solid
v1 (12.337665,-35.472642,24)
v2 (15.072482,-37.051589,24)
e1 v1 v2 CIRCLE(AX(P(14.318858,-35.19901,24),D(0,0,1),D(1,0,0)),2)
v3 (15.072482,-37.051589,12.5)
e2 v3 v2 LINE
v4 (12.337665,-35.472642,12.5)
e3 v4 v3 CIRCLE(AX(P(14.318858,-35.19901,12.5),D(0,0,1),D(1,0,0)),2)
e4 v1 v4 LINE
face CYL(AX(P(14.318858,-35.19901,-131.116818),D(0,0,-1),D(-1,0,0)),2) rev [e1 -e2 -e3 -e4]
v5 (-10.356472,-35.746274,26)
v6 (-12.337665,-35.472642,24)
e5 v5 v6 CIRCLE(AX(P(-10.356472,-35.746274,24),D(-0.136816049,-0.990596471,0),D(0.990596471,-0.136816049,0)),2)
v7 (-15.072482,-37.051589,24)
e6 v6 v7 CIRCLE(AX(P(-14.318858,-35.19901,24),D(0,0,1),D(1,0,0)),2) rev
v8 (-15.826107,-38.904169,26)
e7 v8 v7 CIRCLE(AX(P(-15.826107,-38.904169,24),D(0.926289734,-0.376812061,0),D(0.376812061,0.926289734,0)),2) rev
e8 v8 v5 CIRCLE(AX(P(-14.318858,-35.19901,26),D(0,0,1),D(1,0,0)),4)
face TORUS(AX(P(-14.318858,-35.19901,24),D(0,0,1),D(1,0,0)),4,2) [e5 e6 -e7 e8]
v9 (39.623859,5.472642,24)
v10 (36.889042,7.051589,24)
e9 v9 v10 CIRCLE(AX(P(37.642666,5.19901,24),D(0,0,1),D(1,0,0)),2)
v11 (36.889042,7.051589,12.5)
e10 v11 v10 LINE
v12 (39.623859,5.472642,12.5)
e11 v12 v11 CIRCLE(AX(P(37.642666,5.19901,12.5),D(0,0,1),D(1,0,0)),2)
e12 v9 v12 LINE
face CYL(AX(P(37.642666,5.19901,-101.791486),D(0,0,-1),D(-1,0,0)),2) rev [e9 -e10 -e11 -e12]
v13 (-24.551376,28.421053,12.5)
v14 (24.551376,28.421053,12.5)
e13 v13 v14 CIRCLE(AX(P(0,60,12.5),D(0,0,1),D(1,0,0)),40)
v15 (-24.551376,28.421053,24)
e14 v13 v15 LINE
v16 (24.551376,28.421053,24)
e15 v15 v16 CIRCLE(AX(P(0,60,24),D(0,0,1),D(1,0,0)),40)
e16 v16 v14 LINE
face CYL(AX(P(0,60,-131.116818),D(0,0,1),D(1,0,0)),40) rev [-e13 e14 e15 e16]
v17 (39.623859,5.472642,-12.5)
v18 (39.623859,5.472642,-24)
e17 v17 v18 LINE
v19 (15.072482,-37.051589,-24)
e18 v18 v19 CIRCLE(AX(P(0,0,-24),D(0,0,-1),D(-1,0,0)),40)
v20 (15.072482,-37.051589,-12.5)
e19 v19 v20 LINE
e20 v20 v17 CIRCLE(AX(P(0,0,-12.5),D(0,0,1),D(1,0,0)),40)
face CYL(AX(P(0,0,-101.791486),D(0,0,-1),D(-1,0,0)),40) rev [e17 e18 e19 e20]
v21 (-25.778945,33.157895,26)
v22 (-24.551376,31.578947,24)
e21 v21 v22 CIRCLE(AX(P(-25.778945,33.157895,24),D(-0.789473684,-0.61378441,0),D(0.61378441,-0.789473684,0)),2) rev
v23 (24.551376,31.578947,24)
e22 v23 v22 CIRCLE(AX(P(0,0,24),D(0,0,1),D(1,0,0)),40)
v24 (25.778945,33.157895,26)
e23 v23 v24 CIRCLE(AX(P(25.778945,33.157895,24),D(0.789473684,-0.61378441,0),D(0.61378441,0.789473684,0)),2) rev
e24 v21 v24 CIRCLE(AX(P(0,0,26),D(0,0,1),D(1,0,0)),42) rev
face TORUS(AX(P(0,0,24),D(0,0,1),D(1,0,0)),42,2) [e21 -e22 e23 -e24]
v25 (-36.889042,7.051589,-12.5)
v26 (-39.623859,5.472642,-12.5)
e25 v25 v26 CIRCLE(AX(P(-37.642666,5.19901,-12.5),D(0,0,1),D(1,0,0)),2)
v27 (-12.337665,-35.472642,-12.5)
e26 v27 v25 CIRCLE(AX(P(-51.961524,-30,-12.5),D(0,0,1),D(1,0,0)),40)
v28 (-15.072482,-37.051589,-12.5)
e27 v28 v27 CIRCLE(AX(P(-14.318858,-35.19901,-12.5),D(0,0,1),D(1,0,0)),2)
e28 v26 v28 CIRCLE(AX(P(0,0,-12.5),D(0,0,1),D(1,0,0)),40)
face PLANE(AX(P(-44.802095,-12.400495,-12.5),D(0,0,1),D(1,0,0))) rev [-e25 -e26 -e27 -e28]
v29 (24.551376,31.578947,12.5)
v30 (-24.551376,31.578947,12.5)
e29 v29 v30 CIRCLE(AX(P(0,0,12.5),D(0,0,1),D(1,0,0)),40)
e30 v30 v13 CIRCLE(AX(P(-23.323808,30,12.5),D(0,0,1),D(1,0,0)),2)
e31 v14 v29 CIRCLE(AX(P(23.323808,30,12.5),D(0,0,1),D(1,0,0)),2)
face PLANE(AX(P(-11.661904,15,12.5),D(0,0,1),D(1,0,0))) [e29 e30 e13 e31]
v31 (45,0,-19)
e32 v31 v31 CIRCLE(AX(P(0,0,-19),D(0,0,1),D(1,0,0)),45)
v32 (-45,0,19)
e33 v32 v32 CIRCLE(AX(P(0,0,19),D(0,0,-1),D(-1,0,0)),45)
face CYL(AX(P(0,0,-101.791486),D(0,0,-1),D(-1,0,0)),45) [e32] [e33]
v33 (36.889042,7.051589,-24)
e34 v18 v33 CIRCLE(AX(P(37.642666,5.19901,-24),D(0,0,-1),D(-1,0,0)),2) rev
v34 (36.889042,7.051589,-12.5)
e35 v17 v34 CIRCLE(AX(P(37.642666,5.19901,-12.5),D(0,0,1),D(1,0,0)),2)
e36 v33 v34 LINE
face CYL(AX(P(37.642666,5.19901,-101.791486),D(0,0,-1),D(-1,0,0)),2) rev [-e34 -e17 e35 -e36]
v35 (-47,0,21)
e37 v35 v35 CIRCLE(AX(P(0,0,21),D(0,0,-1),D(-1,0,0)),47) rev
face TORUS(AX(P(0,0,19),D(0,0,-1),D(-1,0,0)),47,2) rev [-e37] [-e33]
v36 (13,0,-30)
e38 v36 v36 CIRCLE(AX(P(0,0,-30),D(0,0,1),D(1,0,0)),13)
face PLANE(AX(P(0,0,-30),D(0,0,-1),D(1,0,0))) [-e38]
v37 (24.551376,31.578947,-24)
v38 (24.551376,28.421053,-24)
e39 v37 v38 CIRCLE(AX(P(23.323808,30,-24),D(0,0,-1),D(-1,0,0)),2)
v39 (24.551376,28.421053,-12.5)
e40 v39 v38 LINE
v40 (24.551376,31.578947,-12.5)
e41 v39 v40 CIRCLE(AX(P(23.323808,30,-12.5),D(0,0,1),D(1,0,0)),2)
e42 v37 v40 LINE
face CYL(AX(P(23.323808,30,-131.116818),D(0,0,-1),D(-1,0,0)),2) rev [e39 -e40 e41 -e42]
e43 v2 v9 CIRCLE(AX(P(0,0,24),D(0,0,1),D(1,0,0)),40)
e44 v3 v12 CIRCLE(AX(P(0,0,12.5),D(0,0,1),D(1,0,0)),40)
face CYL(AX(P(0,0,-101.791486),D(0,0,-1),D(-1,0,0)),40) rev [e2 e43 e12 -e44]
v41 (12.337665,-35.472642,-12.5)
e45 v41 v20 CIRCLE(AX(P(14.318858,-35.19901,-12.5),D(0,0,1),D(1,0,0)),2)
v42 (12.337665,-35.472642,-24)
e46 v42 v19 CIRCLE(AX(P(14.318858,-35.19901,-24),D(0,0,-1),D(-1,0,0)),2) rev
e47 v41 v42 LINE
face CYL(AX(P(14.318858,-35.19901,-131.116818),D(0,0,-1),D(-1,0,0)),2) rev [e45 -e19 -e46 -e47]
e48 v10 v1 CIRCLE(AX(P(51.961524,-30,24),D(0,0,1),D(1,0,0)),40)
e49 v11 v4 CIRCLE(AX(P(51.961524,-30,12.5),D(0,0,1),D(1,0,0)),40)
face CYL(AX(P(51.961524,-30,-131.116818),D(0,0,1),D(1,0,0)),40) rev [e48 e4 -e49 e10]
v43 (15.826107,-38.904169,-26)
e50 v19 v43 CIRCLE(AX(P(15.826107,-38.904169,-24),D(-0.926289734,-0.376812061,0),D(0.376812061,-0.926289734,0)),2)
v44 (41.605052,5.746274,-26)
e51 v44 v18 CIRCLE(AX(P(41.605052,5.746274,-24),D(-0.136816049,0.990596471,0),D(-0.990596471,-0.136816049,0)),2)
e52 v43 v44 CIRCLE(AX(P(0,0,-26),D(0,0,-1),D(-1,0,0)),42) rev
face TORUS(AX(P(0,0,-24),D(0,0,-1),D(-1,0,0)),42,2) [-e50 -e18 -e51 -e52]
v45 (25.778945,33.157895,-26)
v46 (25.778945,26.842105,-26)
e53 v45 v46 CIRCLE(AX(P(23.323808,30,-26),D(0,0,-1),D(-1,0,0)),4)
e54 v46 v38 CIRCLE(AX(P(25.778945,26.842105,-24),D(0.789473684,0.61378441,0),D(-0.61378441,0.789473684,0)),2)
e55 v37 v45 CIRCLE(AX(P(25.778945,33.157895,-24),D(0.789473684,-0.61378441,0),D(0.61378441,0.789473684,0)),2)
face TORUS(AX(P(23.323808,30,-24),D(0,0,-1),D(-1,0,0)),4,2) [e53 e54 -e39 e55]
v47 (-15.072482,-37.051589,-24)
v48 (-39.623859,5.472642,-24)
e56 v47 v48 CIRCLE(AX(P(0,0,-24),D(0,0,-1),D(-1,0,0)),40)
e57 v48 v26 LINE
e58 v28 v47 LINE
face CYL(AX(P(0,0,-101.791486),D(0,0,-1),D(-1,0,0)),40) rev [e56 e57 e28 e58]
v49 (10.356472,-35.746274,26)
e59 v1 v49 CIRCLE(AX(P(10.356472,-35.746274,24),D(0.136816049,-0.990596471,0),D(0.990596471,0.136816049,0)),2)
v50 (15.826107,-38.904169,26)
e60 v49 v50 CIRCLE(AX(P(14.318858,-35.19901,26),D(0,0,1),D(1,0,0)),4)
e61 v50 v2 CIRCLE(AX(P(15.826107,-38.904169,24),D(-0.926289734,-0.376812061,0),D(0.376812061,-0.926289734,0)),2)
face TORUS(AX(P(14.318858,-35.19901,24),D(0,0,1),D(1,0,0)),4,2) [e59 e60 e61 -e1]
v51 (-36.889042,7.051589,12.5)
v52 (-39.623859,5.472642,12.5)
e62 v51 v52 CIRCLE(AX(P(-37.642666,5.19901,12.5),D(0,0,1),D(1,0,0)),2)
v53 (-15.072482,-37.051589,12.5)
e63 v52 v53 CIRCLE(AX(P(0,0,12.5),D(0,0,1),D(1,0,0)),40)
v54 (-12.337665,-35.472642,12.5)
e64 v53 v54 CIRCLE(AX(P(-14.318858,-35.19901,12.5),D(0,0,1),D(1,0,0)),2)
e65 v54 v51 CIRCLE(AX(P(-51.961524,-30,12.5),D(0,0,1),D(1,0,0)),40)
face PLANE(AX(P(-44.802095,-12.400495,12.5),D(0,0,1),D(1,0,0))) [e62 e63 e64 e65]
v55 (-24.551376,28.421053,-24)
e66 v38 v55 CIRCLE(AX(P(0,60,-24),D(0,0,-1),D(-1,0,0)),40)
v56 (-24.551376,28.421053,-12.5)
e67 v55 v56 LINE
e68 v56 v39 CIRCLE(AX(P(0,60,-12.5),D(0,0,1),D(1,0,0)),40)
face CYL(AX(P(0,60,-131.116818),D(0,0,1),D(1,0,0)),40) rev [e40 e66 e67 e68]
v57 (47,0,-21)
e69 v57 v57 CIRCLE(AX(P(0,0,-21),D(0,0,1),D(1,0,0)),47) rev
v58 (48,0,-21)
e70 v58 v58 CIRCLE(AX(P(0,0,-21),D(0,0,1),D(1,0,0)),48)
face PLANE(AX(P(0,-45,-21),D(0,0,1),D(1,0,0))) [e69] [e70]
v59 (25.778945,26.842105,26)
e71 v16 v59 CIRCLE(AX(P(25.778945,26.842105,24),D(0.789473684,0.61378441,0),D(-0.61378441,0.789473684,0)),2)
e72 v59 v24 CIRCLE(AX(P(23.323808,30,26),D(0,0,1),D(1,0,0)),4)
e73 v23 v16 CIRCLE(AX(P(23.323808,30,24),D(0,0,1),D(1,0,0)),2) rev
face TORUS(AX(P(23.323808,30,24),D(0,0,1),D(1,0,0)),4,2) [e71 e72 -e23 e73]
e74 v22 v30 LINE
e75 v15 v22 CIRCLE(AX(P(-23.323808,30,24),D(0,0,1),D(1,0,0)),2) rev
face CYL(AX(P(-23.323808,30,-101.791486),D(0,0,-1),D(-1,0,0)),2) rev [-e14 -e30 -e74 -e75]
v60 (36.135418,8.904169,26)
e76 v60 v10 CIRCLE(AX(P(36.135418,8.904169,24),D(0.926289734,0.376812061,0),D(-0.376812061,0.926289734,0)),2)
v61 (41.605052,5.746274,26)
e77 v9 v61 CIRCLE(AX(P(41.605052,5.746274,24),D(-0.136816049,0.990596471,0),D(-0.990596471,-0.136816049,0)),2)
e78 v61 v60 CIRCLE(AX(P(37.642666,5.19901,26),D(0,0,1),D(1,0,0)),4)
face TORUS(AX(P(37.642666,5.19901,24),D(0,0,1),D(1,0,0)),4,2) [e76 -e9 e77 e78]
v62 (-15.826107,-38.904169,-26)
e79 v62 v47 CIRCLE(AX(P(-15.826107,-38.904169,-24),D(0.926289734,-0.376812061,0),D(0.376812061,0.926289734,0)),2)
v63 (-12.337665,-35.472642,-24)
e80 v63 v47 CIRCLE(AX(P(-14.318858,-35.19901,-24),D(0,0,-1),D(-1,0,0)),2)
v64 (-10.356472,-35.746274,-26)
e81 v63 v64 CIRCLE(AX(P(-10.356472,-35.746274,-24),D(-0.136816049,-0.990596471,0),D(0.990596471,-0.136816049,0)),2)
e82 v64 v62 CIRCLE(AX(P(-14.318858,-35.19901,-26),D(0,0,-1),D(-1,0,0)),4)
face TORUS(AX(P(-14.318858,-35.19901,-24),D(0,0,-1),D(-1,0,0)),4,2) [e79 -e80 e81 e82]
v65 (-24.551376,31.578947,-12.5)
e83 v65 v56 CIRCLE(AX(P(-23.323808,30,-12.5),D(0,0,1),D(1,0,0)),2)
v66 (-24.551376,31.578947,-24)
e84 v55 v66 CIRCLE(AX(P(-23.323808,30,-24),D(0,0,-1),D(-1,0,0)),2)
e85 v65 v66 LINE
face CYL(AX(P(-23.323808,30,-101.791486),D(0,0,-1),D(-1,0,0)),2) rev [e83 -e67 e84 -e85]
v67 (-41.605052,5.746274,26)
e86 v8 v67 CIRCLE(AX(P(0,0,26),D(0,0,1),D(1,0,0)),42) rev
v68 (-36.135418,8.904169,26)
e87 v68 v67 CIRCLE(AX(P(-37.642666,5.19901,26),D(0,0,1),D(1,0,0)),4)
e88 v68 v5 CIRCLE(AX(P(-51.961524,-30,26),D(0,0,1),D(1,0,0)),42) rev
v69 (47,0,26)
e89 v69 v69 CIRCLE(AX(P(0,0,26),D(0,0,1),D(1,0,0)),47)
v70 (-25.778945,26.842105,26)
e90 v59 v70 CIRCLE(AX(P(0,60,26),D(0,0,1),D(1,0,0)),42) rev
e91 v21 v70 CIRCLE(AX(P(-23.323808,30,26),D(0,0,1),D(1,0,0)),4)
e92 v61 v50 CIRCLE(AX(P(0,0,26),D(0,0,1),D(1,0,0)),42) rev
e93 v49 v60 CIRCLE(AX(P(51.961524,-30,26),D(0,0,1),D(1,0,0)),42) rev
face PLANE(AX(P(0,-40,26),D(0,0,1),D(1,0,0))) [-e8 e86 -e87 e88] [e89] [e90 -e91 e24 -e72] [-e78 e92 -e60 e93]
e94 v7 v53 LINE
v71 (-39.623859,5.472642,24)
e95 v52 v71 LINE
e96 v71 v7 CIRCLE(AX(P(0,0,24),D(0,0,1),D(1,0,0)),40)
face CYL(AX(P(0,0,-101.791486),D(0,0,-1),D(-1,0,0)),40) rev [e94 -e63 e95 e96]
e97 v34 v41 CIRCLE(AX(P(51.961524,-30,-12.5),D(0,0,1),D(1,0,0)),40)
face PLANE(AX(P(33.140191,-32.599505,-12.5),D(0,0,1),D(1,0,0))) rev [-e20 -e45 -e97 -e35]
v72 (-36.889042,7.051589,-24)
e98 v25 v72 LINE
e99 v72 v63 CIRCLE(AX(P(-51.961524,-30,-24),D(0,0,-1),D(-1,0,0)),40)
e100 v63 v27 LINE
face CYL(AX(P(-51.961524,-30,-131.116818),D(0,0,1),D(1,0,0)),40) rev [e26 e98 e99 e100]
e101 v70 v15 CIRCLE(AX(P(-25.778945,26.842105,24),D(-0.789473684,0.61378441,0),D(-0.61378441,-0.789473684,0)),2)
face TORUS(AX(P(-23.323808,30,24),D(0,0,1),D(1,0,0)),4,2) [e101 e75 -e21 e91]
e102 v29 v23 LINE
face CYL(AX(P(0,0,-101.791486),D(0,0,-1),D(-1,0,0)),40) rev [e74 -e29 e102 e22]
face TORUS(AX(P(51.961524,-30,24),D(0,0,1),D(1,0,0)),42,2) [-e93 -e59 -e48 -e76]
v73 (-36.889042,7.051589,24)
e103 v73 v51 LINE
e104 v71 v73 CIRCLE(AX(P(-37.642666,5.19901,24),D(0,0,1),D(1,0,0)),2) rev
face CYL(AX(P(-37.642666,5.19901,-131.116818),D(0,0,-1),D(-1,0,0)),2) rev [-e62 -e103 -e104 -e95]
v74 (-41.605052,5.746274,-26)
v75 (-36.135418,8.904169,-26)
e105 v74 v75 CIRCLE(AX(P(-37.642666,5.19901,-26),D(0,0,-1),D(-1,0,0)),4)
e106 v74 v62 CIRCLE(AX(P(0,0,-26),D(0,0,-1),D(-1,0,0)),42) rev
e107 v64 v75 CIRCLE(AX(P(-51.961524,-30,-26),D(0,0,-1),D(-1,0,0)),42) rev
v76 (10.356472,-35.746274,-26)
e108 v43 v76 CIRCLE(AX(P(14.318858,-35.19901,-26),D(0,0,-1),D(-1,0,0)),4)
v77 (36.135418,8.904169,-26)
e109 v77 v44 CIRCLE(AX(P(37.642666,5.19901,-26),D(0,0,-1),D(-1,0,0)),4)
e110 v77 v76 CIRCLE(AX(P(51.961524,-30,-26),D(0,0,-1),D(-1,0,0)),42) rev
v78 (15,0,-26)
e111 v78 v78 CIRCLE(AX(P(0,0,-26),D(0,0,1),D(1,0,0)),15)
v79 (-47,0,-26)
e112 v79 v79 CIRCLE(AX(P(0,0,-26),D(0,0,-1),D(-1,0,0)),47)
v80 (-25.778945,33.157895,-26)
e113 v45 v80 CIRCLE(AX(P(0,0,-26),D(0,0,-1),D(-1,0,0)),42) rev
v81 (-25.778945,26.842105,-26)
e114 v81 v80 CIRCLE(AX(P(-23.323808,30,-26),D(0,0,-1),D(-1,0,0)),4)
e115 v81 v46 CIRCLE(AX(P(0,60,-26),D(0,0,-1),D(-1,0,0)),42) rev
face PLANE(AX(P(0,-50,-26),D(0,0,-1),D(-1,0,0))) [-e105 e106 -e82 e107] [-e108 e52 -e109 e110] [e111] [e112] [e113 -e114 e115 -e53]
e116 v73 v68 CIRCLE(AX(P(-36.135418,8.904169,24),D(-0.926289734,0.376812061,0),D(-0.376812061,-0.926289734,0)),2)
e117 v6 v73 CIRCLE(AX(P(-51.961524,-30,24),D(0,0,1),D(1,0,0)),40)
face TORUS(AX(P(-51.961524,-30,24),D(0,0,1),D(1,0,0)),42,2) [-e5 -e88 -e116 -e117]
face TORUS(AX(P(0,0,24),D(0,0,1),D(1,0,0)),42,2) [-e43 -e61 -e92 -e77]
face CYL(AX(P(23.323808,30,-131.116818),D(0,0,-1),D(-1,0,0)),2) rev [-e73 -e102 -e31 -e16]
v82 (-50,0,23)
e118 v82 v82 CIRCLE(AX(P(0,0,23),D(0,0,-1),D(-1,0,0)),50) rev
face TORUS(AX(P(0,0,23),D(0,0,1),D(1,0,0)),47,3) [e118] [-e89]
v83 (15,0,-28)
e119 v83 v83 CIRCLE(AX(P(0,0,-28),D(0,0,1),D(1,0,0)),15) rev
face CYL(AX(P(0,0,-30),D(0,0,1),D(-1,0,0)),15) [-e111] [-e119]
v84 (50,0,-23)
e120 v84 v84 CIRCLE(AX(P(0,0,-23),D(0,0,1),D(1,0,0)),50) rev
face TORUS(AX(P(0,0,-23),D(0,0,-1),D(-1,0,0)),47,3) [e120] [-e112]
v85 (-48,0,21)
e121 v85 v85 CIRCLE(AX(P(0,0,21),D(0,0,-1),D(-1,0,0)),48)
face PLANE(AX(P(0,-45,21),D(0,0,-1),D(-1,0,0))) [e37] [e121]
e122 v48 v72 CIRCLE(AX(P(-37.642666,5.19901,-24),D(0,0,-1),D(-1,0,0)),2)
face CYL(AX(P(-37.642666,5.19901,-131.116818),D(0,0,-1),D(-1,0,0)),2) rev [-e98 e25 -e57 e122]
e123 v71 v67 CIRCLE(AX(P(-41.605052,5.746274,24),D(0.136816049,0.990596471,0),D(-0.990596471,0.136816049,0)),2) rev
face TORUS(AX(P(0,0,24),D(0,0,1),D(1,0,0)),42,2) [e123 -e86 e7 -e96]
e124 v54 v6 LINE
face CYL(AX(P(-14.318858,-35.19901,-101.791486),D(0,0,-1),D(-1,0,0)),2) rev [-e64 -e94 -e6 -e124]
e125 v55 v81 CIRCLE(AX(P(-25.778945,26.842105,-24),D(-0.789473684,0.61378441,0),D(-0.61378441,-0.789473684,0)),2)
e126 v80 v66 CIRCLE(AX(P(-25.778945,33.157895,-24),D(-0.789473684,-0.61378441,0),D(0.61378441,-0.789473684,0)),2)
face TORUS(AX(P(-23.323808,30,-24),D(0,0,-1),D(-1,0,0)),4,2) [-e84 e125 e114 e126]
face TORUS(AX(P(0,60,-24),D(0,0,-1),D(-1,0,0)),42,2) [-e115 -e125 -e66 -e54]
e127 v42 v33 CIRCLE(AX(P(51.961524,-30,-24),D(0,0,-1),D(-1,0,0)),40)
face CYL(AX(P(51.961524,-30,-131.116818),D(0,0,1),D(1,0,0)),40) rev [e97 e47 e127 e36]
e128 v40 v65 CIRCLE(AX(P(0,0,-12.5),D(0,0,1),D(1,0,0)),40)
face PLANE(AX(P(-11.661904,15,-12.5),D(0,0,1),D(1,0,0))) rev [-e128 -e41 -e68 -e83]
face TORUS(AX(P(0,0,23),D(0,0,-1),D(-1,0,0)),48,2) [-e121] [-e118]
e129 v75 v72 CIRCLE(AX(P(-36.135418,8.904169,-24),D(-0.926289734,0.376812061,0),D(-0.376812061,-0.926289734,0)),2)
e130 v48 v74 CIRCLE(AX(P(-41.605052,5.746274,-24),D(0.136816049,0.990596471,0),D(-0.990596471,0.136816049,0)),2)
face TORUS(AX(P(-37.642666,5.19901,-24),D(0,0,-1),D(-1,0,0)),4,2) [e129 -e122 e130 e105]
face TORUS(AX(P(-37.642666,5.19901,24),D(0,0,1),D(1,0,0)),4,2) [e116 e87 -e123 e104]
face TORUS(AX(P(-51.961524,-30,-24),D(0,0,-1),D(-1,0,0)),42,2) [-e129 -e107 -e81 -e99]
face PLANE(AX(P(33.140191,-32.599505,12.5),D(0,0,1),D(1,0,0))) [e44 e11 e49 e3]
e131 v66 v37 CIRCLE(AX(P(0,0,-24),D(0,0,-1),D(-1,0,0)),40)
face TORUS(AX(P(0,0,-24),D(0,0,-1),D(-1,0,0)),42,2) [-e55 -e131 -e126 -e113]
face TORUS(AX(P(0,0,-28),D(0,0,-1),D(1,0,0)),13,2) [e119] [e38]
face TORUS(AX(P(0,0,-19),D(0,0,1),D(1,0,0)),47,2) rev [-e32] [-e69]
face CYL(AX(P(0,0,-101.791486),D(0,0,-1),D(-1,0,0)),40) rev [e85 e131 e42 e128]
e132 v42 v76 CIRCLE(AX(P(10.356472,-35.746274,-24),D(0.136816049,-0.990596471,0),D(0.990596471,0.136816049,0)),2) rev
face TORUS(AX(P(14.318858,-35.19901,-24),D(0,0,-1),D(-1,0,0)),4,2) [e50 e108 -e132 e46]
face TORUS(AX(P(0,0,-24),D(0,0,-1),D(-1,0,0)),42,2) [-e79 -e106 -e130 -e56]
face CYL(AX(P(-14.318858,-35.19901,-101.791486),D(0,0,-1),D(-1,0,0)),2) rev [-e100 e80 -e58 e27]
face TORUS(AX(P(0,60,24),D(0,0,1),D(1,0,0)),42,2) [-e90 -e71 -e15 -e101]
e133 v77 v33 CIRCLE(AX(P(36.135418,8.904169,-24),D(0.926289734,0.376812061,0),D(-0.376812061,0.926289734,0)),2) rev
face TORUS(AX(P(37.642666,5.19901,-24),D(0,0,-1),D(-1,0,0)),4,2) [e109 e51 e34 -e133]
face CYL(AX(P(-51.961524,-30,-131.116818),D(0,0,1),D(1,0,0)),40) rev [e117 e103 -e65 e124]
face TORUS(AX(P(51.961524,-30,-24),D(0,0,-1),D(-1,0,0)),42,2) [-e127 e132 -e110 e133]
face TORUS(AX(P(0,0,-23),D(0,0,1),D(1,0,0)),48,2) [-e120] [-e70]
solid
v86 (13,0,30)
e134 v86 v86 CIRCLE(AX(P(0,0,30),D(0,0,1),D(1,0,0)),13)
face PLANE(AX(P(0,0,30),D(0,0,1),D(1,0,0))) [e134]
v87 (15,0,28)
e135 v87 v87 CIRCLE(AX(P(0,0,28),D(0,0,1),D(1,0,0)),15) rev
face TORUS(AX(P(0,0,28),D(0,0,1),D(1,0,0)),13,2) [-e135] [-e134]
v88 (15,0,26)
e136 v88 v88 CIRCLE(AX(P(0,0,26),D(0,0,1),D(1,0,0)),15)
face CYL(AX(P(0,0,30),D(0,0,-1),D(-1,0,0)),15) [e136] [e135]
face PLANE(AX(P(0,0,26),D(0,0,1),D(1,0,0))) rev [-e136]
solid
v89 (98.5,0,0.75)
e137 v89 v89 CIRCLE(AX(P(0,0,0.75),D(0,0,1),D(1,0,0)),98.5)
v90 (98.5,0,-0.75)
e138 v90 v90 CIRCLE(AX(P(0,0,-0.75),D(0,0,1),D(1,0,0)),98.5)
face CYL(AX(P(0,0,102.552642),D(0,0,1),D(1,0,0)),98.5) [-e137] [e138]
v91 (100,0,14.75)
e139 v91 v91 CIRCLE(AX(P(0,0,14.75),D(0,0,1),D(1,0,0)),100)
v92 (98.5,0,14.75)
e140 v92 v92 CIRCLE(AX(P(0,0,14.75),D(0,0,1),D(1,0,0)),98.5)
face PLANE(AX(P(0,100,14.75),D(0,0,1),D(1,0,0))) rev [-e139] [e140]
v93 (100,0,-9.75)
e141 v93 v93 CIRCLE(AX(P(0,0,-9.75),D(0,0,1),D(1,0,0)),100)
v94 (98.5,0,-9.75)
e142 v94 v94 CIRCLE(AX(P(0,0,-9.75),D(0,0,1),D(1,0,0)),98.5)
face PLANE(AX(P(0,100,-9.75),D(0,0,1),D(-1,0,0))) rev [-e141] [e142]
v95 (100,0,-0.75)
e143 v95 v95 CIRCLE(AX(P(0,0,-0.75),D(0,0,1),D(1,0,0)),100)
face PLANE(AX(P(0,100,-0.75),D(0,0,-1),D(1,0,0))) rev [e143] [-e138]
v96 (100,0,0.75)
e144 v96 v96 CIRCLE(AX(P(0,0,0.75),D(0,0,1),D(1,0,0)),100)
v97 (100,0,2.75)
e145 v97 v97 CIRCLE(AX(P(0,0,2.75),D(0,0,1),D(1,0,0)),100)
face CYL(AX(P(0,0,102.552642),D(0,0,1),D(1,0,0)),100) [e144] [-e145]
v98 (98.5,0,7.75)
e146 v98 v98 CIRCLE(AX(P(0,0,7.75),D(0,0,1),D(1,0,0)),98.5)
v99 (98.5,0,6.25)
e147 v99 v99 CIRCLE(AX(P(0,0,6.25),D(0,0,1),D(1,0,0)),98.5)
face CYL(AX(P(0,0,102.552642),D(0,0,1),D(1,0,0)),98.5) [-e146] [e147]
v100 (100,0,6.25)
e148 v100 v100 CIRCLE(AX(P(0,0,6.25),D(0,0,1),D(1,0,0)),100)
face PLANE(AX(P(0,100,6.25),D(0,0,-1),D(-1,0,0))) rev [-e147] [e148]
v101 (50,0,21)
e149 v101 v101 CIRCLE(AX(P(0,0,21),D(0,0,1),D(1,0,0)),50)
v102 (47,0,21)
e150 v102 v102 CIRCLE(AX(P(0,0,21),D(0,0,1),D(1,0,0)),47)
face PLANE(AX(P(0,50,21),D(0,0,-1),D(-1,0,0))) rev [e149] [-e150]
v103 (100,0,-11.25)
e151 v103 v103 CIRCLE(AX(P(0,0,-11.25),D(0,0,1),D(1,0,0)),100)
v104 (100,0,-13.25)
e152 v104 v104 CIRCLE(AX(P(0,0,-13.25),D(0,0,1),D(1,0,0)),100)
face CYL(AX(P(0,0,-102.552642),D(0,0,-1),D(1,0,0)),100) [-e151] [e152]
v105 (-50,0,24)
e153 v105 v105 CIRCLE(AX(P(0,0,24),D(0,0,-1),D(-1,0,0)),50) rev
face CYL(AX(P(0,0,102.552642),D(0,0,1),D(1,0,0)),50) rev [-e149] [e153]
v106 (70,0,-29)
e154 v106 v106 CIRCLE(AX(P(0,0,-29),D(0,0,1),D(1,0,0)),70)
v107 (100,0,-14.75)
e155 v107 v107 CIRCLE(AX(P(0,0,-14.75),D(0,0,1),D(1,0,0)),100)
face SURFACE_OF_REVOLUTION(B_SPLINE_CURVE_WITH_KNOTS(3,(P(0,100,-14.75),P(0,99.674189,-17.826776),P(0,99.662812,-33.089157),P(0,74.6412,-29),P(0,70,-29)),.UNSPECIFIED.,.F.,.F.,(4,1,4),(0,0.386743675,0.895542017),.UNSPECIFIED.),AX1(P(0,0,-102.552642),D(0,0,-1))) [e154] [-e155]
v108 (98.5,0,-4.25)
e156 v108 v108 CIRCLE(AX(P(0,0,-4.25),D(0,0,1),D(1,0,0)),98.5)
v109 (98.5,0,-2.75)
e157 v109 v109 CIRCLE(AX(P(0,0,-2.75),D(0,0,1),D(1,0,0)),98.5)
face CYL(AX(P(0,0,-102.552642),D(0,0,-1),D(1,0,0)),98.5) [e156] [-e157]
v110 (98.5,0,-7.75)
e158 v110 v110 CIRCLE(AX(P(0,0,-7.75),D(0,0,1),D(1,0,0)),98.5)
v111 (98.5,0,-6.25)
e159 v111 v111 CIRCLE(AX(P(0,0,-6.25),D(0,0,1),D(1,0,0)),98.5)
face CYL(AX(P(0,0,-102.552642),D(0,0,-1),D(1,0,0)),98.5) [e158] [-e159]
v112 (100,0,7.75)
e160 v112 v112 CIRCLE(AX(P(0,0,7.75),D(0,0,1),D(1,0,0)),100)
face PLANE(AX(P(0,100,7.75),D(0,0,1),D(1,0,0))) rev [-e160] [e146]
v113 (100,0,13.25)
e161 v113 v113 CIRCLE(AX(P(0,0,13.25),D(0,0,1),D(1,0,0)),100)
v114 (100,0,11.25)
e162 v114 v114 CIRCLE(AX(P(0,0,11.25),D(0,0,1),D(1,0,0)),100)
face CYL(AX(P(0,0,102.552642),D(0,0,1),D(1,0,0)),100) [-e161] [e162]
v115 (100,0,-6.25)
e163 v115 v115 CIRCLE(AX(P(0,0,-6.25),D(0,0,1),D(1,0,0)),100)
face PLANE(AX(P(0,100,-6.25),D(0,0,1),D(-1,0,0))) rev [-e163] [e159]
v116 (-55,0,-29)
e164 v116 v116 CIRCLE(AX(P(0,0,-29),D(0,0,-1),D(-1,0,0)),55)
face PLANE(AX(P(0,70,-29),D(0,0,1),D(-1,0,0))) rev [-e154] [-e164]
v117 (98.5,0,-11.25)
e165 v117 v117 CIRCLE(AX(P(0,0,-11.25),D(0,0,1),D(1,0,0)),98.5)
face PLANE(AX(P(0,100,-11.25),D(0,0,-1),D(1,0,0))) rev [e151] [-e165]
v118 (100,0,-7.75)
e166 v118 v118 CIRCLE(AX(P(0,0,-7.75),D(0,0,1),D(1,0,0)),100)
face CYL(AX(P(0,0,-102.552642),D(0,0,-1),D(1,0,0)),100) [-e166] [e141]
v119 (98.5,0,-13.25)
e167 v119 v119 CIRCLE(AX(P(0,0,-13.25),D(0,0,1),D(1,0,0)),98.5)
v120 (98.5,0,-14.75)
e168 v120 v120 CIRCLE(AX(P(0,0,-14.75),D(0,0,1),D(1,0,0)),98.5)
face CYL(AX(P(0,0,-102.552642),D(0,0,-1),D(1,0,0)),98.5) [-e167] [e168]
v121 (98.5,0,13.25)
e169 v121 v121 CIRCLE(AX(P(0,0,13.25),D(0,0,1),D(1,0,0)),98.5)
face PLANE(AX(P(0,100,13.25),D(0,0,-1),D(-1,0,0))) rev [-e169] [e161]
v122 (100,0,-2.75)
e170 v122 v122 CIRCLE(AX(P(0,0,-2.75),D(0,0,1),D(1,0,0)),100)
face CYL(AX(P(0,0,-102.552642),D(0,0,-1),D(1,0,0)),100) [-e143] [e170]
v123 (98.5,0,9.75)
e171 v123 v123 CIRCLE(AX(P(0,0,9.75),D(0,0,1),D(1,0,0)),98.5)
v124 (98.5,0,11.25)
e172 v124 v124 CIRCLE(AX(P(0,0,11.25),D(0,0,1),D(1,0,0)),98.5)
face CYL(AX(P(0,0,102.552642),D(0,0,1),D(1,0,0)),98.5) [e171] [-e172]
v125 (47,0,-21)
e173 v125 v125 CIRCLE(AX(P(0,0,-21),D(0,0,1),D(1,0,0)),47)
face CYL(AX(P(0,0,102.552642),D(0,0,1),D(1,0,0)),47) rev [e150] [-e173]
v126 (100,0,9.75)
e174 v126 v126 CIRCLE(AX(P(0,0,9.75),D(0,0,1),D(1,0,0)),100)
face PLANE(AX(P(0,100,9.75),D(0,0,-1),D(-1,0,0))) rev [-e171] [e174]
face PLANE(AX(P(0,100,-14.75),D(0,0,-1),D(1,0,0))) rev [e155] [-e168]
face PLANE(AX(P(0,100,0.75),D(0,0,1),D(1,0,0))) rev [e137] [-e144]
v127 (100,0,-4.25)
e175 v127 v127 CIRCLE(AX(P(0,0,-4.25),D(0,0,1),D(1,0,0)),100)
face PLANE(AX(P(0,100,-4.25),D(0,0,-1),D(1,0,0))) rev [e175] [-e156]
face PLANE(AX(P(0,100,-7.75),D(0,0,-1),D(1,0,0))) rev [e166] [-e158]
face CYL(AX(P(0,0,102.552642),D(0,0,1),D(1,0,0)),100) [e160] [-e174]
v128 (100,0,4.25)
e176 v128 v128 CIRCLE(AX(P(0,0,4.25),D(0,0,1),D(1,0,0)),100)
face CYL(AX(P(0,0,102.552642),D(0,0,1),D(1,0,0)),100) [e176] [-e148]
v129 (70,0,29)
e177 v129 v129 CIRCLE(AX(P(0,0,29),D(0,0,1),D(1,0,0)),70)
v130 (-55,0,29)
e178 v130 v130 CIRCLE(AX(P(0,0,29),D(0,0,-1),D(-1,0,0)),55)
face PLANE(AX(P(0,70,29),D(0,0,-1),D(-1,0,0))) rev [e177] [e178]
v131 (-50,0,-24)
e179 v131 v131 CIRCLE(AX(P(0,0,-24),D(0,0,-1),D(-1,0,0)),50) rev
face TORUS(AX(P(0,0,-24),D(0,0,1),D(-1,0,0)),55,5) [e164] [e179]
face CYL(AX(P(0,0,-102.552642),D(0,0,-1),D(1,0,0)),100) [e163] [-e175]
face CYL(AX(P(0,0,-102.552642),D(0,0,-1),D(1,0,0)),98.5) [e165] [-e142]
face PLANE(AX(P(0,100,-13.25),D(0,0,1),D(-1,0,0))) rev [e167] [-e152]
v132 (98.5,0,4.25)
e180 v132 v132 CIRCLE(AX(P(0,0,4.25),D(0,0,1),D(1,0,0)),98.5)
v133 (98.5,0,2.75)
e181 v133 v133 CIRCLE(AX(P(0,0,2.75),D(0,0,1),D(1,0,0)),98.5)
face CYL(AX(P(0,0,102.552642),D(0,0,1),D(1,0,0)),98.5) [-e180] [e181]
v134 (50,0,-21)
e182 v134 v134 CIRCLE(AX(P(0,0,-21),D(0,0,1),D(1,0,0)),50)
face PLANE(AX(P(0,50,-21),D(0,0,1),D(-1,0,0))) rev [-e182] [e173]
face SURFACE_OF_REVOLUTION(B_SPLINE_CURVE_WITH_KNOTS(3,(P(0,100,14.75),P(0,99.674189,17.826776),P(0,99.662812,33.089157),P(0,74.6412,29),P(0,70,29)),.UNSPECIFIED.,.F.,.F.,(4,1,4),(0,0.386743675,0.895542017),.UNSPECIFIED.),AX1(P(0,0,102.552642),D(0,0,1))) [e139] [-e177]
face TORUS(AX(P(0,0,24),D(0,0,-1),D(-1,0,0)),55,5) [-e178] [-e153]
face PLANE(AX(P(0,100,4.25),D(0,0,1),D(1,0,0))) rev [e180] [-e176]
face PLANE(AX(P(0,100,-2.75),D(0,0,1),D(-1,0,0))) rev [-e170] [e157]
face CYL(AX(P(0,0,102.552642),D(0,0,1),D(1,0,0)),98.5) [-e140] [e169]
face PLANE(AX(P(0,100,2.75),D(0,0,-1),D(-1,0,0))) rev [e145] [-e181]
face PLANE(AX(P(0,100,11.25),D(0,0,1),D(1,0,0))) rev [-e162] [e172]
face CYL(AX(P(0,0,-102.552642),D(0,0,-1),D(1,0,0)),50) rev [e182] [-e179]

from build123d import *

# Parameters (mm, degrees)
BOSS_EXTRUDE1_DEPTH      = 52
SKETCH4_R                = 15
BOSS_EXTRUDE2_DEPTH      = 4
FILLET4_R                = 2
FILLET4_OF_MIRROR3_R     = 2
FILLET1_R                = 2
FILLET2_R                = 3
FILLET3_R                = 2
BOSS_EXTRUDE4_DEPTH      = 12.5
BOSS_EXTRUDE4_DEPTH_BACK = 12.5
FILLET6_R                = 5
FILLET6_OF_MIRROR4_R     = 5


with BuildPart() as part:
    # Sketch1 → Revolve1 (revolve)
    with BuildSketch(Plane.ZY, mode=Mode.PRIVATE) as revolve1_sk:
        Polygon((-21, -50), (-26, -50), (-26, -40), (26, -40), (26, -50), (21, -50), (21, -45), (-21, -45), align=None)
    revolve(revolve1_sk.sketch.rotate(Axis((0, 0, -101.791486329), (0, 0, 1)), 270), axis=Axis((0, 0, -101.791486329), (0, 0, 1)))

    # Sketch3 → Boss-Extrude1 (add)
    with BuildSketch(Plane.XY.offset(26)):
        with BuildLine():
            ThreePointArc((-26.457513111, 30), (0, 20), (26.457513111, 30))
            ThreePointArc((26.457513111, 30), (34.641016151, 20), (39.209518669, 7.912878475))
            ThreePointArc((39.209518669, 7.912878475), (17.320508076, -10), (12.752005558, -37.912878475))
            ThreePointArc((12.752005558, -37.912878475), (0, -40), (-12.752005558, -37.912878475))
            ThreePointArc((-12.752005558, -37.912878475), (-17.320508076, -10), (-39.209518669, 7.912878475))
            ThreePointArc((-39.209518669, 7.912878475), (-34.641016151, 20), (-26.457513111, 30))
        make_face()
    extrude(amount=-BOSS_EXTRUDE1_DEPTH)


with BuildPart() as body_2:
    # Sketch4 → Boss-Extrude2 (new body)
    with BuildSketch(Plane.XY.offset(26)):
        Circle(SKETCH4_R)
    boss_extrude2 = extrude(amount=BOSS_EXTRUDE2_DEPTH)

    # Fillet4
    fillet4_edges = [body_2.edges().sort_by_distance(p)[0] for p in [
        (-15, 0, 30),
    ]]
    fillet(fillet4_edges, radius=FILLET4_R)


with BuildPart() as part_1:
    add(part.part)

    # Mirror3: Boss-Extrude2 across plane
    add(boss_extrude2.mirror(Plane.XY))

    # Fillet4 of Mirror3
    fillet4_of_mirror3_edges = [part_1.edges().sort_by_distance(p)[0] for p in [
        (-15, 0, -30),
    ]]
    fillet(fillet4_of_mirror3_edges, radius=FILLET4_OF_MIRROR3_R)

    # Fillet1
    fillet1_edges = [part_1.edges().sort_by_distance(p)[0] for p in [
        (45, 0, -21),
        (45, 0, 21),
        (50, 0, 21),
        (50, 0, -21),
    ]]
    fillet(fillet1_edges, radius=FILLET1_R)

    # Fillet2
    fillet2_edges = [part_1.edges().sort_by_distance(p)[0] for p in [
        (50, 0, 26),
        (50, 0, -26),
    ]]
    fillet(fillet2_edges, radius=FILLET2_R - 0.0001)  # a hair under: the kernel refuses the full size

    # Fillet3
    fillet3_edges = [part_1.edges().sort_by_distance(p)[0] for p in [
        (0, 40, 26),
        (34.641016151, -20, 26),
        (-34.641016151, -20, 26),
        (0, 40, -26),
        (34.641016151, -20, -26),
        (-34.641016151, -20, -26),
        (-17.320508076, -10, 26),
        (17.320508076, -10, 26),
        (0, 20, 26),
        (-17.320508076, -10, -26),
        (-12.752005558, -37.912878475, 0),
        (12.752005558, -37.912878475, 0),
        (17.320508076, -10, -26),
        (39.209518669, 7.912878475, 0),
        (26.457513111, 30, 0),
        (0, 20, -26),
        (-26.457513111, 30, 0),
        (-39.209518669, 7.912878475, 0),
    ]]
    fillet(fillet3_edges, radius=FILLET3_R)

    # Sketch8 → Boss-Extrude4 (add, two sides: drawn at the far end of the back side and taken through both)
    with BuildSketch(Plane.XY.offset(-BOSS_EXTRUDE4_DEPTH_BACK)):
        with BuildLine():
            ThreePointArc((-36.889041781, 7.051589344), (-38.642665903, 6.931060684), (-39.623858845, 5.472641975))
            ThreePointArc((-39.623858845, 5.472641975), (-34.641016151, -20), (-15.072482446, -37.051589344))
            ThreePointArc((-15.072482446, -37.051589344), (-13.318858324, -36.931060684), (-12.337665382, -35.472641975))
            ThreePointArc((-12.337665382, -35.472641975), (-17.320508076, -10), (-36.889041781, 7.051589344))
        make_face()
        with BuildLine():
            ThreePointArc((12.337665382, -35.472641975), (13.318858324, -36.931060684), (15.072482446, -37.051589344))
            ThreePointArc((15.072482446, -37.051589344), (34.641016151, -20), (39.623858845, 5.472641975))
            ThreePointArc((39.623858845, 5.472641975), (38.642665903, 6.931060684), (36.889041781, 7.051589344))
            ThreePointArc((36.889041781, 7.051589344), (17.320508076, -10), (12.337665382, -35.472641975))
        make_face()
        with BuildLine():
            ThreePointArc((-24.551376399, 31.578947368), (-25.323807579, 30), (-24.551376399, 28.421052632))
            ThreePointArc((-24.551376399, 28.421052632), (0, 20), (24.551376399, 28.421052632))
            ThreePointArc((24.551376399, 28.421052632), (25.323807579, 30), (24.551376399, 31.578947368))
            ThreePointArc((24.551376399, 31.578947368), (0, 40), (-24.551376399, 31.578947368))
        make_face()
    extrude(amount=BOSS_EXTRUDE4_DEPTH + BOSS_EXTRUDE4_DEPTH_BACK)


with BuildPart() as body_3:
    # Sketch6 → Revolve2 (revolve)
    with BuildSketch(Plane(origin=(0, 0, 0), x_dir=(0, 0, -1), z_dir=(1, 0, 0)), mode=Mode.PRIVATE) as revolve2_sk:
        with BuildLine():
            Line((-29, 50), (-21, 50))
            Line((-21, 50), (-21, 47))
            Line((-21, 47), (0, 47))
            Line((0, 47), (0, 98.5))
            Line((0, 98.5), (-0.75, 98.5))
            Line((-0.75, 98.5), (-0.75, 100))
            Line((-0.75, 100), (-2.75, 100))
            Line((-2.75, 100), (-2.75, 98.5))
            Line((-2.75, 98.5), (-4.25, 98.5))
            Line((-4.25, 98.5), (-4.25, 100))
            Line((-4.25, 100), (-6.25, 100))
            Line((-6.25, 100), (-6.25, 98.5))
            Line((-6.25, 98.5), (-7.75, 98.5))
            Line((-7.75, 98.5), (-7.75, 100))
            Line((-7.75, 100), (-9.75, 100))
            Line((-9.75, 100), (-9.75, 98.5))
            Line((-9.75, 98.5), (-11.25, 98.5))
            Line((-11.25, 98.5), (-11.25, 100))
            Line((-11.25, 100), (-13.25, 100))
            Line((-13.25, 100), (-13.25, 98.5))
            Line((-13.25, 98.5), (-14.75, 98.5))
            Line((-14.75, 98.5), (-14.75, 100))
            add(Edge.make_bspline(
                [(-29, 70), (-29, 74.641200086), (-33.089156979, 99.662811598), (-17.826776001, 99.6741887), (-14.75, 100)],
                knots=[0, 0, 0, 0, 0.508798342, 0.895542017, 0.895542017, 0.895542017, 0.895542017], degree=3))
            Line((-29, 70), (-29, 50))
        make_face()
    revolve2 = revolve(revolve2_sk.sketch.rotate(Axis((0, 0, 102.552642411), (0, 0, -1)), 90), axis=Axis((0, 0, 102.552642411), (0, 0, -1)))

    # Fillet6
    fillet6_edges = [body_3.edges().sort_by_distance(p)[0] for p in [
        (-50, 0, 29),
    ]]
    fillet(fillet6_edges, radius=FILLET6_R)

    # Mirror4: Revolve2 across Front Plane
    add(revolve2.mirror(Plane.XY))

    # Fillet6 of Mirror4
    fillet6_of_mirror4_edges = [body_3.edges().sort_by_distance(p)[0] for p in [
        (-50, 0, -29),
    ]]
    fillet(fillet6_of_mirror4_edges, radius=FILLET6_OF_MIRROR4_R)


solid = Compound([body_2.part, part_1.part, body_3.part])
